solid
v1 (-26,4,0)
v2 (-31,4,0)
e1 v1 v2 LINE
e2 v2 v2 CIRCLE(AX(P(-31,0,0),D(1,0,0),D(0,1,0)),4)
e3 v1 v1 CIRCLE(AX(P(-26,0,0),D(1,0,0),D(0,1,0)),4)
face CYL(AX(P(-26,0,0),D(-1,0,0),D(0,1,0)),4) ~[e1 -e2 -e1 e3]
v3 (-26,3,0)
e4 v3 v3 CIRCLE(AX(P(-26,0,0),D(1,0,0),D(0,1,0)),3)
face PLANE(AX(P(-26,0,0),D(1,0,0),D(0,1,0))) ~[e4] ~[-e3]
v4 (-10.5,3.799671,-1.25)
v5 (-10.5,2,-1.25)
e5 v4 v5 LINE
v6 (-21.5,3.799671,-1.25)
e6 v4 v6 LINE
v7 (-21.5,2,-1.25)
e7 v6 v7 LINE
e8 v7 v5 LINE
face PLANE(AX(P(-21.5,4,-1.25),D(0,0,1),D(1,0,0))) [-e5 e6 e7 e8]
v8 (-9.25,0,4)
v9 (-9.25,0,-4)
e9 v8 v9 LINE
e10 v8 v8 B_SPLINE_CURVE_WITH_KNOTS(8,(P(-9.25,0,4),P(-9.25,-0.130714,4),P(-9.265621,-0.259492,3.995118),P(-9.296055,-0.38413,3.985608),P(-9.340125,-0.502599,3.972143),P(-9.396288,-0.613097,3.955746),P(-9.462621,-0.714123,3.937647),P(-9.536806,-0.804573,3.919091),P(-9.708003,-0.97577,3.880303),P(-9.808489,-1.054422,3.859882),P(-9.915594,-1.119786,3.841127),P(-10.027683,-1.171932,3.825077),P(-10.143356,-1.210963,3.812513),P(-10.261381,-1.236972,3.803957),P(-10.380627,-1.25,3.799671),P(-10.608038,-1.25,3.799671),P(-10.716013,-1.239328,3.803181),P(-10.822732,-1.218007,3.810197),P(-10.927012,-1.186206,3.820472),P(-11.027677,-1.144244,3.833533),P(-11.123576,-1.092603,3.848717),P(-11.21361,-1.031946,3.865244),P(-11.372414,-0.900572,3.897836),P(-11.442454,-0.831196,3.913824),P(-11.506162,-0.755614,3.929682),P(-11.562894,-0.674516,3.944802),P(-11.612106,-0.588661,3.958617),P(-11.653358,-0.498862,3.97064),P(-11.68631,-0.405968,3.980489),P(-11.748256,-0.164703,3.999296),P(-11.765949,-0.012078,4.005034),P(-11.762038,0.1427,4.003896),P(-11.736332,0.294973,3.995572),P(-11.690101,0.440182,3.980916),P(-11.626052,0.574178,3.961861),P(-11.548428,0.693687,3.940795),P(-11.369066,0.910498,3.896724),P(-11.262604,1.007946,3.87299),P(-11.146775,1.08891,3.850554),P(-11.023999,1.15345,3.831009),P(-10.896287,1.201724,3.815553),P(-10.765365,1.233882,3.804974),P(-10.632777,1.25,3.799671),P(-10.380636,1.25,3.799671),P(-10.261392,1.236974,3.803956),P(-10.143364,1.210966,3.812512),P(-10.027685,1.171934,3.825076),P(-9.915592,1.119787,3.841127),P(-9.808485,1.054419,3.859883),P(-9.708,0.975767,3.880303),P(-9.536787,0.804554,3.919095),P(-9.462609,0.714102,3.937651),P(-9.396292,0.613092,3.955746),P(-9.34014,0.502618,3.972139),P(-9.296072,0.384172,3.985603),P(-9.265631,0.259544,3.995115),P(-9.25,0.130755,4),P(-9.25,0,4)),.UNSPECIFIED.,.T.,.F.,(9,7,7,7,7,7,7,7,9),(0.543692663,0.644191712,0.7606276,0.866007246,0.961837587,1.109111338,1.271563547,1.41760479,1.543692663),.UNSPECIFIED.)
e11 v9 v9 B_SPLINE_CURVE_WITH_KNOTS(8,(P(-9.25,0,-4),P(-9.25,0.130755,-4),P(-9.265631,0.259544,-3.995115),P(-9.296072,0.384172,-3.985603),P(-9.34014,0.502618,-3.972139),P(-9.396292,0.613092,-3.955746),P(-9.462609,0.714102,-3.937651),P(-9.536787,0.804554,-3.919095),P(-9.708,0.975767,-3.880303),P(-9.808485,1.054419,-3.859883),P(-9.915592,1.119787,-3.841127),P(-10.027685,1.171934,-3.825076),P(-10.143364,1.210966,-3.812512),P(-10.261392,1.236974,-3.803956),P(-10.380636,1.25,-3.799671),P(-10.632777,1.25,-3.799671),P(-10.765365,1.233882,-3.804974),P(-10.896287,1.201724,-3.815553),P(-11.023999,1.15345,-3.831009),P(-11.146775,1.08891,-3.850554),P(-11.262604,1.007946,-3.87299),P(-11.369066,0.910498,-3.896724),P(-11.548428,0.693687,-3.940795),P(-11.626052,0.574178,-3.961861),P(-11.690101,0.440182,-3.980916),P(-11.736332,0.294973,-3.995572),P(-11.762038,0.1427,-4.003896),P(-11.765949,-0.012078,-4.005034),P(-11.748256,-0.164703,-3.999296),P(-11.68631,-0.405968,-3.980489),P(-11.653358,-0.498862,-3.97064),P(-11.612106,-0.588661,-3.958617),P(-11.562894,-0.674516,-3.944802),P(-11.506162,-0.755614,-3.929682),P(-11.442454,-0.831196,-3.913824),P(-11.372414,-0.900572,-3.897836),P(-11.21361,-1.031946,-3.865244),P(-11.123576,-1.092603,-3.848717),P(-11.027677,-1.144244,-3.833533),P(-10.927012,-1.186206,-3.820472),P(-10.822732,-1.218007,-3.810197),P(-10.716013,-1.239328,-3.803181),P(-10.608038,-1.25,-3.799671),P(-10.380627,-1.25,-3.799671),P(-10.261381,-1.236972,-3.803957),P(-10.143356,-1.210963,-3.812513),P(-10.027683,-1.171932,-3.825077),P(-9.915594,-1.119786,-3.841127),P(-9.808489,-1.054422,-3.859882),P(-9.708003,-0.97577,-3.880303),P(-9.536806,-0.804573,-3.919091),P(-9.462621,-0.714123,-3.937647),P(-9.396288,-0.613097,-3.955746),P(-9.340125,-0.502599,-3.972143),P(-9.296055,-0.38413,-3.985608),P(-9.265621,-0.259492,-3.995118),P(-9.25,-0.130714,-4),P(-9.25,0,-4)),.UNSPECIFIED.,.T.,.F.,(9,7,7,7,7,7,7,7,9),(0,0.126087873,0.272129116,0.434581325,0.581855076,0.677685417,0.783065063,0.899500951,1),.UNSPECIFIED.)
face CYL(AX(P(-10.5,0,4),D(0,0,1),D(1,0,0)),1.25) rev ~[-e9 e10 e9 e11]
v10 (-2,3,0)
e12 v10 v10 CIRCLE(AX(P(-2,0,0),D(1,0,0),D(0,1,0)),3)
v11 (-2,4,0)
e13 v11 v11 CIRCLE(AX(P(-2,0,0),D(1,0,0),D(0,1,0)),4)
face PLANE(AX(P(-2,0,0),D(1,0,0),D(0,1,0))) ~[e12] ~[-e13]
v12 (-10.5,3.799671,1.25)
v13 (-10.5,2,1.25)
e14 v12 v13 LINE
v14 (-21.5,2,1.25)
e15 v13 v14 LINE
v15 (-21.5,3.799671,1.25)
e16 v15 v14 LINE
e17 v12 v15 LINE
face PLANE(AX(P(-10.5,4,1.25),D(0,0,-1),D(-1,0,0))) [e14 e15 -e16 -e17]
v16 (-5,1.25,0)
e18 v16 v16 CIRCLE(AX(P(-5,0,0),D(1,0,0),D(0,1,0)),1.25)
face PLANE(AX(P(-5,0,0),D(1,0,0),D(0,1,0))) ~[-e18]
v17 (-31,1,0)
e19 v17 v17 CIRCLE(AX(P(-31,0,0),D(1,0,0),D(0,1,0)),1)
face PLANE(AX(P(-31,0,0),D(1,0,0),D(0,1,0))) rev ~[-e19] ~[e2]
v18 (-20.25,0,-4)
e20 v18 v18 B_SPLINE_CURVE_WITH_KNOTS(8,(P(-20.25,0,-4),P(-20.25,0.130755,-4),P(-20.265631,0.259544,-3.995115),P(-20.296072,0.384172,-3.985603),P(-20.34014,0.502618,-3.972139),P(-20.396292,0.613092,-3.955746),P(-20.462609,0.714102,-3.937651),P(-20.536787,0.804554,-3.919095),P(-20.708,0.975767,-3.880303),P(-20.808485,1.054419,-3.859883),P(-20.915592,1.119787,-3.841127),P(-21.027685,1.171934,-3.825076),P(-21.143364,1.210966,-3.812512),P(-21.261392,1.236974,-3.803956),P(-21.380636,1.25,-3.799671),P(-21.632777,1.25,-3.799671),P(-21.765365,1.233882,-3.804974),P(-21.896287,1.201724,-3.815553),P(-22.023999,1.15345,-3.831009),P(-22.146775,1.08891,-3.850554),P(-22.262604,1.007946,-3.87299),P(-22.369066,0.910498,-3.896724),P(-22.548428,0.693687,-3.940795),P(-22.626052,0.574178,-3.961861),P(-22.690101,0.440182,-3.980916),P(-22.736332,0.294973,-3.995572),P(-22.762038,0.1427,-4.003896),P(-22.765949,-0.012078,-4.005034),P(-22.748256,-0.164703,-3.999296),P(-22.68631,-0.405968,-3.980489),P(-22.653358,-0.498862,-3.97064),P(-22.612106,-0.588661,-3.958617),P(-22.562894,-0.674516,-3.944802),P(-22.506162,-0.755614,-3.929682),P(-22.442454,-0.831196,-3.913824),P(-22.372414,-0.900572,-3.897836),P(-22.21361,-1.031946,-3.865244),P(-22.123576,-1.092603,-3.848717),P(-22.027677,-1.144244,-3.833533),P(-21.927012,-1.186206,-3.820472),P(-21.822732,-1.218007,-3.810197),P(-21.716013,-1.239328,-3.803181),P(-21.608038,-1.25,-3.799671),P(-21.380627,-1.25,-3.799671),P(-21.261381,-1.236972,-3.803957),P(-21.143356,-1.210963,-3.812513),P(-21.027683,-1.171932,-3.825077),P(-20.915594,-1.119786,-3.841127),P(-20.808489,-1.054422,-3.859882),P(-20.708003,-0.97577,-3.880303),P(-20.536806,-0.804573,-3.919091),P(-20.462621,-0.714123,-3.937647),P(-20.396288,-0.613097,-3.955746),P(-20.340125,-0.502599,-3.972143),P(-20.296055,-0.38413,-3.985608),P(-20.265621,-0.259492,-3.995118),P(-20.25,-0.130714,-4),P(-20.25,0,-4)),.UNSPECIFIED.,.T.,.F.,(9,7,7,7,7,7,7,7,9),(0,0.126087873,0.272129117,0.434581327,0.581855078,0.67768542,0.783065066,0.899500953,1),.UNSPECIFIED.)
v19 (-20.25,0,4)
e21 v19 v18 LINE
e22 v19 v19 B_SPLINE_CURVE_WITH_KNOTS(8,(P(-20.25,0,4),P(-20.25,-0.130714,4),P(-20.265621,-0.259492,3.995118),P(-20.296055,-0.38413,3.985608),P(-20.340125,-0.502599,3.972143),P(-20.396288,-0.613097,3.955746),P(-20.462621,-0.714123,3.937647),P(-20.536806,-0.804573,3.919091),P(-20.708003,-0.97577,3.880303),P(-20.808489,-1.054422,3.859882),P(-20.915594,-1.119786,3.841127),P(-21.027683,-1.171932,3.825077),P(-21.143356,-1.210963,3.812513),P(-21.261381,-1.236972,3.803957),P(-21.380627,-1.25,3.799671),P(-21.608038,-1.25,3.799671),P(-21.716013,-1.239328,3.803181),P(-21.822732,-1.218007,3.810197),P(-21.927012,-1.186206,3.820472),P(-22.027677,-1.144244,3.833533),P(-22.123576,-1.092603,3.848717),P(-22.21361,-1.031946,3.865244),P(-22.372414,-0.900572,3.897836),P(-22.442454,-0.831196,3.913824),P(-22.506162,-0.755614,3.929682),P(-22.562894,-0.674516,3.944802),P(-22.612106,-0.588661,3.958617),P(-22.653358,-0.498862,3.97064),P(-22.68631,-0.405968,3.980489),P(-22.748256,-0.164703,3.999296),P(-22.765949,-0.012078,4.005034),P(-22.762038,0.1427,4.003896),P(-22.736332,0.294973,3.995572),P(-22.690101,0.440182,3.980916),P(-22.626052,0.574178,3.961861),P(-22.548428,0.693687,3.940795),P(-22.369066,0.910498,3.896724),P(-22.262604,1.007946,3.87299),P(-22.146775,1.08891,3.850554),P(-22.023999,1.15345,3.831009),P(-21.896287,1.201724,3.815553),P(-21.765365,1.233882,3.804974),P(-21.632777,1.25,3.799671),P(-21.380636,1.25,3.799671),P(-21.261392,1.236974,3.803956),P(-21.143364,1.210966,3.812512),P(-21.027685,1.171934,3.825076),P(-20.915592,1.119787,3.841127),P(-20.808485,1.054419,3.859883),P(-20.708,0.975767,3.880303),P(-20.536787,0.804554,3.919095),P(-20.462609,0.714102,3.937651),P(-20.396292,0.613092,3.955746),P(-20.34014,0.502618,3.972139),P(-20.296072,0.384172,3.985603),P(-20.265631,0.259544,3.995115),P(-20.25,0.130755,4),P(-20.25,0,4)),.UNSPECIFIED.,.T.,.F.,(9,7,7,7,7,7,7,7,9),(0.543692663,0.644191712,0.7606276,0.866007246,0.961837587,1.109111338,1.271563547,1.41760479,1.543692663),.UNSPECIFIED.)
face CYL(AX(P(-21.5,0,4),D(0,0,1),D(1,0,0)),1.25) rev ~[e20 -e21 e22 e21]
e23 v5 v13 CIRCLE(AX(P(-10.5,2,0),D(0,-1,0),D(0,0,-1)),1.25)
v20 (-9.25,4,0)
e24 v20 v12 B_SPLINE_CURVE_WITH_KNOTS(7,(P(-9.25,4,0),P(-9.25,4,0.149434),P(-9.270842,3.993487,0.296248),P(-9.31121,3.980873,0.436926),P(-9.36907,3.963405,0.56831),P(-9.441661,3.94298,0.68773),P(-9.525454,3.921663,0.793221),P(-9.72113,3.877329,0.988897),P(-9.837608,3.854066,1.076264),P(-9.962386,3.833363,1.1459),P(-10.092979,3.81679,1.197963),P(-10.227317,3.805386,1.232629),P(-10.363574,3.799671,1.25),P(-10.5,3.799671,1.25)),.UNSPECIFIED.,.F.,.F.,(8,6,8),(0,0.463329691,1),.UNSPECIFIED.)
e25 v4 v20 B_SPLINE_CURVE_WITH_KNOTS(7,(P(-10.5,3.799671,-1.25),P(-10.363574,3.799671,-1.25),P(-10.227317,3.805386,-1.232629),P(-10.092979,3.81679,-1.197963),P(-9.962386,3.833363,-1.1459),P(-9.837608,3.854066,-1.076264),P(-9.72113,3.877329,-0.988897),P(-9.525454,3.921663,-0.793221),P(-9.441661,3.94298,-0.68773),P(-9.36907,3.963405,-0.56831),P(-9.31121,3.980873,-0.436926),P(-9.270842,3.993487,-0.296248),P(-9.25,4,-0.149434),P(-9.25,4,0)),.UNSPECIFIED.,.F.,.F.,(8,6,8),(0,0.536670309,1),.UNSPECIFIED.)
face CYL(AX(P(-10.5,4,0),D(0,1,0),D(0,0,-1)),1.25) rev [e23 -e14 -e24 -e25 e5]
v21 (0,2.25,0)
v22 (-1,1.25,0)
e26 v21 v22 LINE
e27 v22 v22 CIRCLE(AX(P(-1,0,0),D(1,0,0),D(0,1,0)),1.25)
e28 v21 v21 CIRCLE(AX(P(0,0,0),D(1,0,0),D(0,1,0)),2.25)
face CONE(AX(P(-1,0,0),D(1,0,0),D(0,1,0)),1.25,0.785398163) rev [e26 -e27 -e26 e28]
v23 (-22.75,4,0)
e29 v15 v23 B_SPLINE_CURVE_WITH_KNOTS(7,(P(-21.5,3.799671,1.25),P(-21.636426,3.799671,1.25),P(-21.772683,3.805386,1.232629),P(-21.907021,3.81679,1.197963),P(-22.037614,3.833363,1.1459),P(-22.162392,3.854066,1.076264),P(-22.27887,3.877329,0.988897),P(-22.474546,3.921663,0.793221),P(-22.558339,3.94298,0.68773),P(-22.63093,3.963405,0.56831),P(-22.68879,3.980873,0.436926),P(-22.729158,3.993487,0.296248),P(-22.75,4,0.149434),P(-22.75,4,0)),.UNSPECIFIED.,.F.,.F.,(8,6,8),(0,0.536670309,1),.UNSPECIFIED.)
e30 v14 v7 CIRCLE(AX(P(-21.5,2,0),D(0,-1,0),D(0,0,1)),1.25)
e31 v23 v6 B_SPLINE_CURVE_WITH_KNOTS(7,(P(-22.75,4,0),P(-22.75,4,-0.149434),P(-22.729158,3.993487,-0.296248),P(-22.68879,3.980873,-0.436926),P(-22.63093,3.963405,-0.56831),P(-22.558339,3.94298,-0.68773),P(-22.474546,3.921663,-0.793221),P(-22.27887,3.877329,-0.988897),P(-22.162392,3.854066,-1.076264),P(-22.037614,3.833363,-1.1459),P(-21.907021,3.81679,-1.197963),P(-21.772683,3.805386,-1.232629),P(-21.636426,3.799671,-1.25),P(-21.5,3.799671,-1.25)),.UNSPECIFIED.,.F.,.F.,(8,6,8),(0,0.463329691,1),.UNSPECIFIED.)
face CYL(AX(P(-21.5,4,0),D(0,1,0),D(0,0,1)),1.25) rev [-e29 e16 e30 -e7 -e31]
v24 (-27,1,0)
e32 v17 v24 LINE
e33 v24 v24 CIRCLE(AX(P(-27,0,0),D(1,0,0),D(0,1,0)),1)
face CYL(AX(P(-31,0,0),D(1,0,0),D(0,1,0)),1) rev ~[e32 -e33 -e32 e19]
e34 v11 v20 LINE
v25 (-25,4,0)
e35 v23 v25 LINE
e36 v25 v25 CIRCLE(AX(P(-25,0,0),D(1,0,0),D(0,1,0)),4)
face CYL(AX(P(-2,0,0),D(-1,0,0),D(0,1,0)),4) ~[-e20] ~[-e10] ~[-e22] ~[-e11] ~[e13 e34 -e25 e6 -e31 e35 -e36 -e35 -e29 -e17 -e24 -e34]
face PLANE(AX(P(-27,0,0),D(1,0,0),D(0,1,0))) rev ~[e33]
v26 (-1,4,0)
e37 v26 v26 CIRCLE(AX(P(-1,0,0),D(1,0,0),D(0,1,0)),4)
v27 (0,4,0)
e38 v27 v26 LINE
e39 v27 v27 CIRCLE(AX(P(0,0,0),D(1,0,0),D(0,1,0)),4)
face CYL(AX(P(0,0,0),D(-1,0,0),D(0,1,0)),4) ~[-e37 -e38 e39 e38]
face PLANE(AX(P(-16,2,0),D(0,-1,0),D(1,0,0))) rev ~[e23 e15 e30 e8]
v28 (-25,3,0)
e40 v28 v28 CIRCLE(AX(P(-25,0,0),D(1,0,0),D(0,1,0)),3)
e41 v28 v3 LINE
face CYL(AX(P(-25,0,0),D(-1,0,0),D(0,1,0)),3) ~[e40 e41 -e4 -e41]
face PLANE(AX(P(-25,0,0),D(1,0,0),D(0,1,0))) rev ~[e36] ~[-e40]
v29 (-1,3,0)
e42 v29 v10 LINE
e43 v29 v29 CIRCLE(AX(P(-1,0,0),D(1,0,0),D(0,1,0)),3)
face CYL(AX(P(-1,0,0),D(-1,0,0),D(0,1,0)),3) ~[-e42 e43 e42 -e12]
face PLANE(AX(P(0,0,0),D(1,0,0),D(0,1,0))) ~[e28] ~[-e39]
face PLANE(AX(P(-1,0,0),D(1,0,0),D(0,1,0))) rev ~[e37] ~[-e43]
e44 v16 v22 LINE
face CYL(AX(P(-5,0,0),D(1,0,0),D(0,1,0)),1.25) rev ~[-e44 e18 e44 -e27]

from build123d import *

# Parameters (mm, degrees)
F3_R     = 1.25
F4_DEPTH = 25
F5_SIZE  = 1
F8_DEPTH = 2


with BuildPart() as f1:
    # F0 (on Top) → F1 (revolve)
    with BuildSketch(Plane.XY):
        Polygon((0, 1.25), (0, 2.9657871928), (0, 4), (-1, 4), (-1, 3), (-2, 3), (-2, 4), (-3, 4), (-8, 4), (-13, 4), (-19, 4), (-24, 4), (-25, 4), (-25, 3), (-26, 3), (-26, 4), (-31, 4), (-31, 1), (-27, 1), (-27, 0), (-5, 0), (-5, 1.25), (-0.9906101976, 1.25), align=None)
    revolve(axis=Axis((5.4950757935, 0, 0), (1, 0, 0)))

    # F3 (on offset) → F4 (cut)
    with BuildSketch(Plane.XY.offset(4)):
        with Locations((-21.5, 0)):
            Circle(F3_R)
        with Locations((-10.5, 0)):
            Circle(F3_R)
    extrude(amount=-F4_DEPTH, mode=Mode.SUBTRACT)

    # F5
    f5_edges = [f1.edges().sort_by_distance(p)[0] for p in [
        (0, -1.25, 0),
    ]]
    chamfer(f5_edges, length=F5_SIZE)

    # F7 (on offset) → F8 (cut)
    with BuildSketch(Plane.XZ.offset(-4)):
        with BuildLine():
            Line((-21.5, -1.25), (-10.5, -1.25))
            ThreePointArc((-10.5, -1.25), (-9.25, 0), (-10.5, 1.25))
            Line((-10.5, 1.25), (-21.5, 1.25))
            ThreePointArc((-21.5, 1.25), (-22.75, 0), (-21.5, -1.25))
        make_face()
    extrude(amount=F8_DEPTH, mode=Mode.SUBTRACT)


solid = f1.part
